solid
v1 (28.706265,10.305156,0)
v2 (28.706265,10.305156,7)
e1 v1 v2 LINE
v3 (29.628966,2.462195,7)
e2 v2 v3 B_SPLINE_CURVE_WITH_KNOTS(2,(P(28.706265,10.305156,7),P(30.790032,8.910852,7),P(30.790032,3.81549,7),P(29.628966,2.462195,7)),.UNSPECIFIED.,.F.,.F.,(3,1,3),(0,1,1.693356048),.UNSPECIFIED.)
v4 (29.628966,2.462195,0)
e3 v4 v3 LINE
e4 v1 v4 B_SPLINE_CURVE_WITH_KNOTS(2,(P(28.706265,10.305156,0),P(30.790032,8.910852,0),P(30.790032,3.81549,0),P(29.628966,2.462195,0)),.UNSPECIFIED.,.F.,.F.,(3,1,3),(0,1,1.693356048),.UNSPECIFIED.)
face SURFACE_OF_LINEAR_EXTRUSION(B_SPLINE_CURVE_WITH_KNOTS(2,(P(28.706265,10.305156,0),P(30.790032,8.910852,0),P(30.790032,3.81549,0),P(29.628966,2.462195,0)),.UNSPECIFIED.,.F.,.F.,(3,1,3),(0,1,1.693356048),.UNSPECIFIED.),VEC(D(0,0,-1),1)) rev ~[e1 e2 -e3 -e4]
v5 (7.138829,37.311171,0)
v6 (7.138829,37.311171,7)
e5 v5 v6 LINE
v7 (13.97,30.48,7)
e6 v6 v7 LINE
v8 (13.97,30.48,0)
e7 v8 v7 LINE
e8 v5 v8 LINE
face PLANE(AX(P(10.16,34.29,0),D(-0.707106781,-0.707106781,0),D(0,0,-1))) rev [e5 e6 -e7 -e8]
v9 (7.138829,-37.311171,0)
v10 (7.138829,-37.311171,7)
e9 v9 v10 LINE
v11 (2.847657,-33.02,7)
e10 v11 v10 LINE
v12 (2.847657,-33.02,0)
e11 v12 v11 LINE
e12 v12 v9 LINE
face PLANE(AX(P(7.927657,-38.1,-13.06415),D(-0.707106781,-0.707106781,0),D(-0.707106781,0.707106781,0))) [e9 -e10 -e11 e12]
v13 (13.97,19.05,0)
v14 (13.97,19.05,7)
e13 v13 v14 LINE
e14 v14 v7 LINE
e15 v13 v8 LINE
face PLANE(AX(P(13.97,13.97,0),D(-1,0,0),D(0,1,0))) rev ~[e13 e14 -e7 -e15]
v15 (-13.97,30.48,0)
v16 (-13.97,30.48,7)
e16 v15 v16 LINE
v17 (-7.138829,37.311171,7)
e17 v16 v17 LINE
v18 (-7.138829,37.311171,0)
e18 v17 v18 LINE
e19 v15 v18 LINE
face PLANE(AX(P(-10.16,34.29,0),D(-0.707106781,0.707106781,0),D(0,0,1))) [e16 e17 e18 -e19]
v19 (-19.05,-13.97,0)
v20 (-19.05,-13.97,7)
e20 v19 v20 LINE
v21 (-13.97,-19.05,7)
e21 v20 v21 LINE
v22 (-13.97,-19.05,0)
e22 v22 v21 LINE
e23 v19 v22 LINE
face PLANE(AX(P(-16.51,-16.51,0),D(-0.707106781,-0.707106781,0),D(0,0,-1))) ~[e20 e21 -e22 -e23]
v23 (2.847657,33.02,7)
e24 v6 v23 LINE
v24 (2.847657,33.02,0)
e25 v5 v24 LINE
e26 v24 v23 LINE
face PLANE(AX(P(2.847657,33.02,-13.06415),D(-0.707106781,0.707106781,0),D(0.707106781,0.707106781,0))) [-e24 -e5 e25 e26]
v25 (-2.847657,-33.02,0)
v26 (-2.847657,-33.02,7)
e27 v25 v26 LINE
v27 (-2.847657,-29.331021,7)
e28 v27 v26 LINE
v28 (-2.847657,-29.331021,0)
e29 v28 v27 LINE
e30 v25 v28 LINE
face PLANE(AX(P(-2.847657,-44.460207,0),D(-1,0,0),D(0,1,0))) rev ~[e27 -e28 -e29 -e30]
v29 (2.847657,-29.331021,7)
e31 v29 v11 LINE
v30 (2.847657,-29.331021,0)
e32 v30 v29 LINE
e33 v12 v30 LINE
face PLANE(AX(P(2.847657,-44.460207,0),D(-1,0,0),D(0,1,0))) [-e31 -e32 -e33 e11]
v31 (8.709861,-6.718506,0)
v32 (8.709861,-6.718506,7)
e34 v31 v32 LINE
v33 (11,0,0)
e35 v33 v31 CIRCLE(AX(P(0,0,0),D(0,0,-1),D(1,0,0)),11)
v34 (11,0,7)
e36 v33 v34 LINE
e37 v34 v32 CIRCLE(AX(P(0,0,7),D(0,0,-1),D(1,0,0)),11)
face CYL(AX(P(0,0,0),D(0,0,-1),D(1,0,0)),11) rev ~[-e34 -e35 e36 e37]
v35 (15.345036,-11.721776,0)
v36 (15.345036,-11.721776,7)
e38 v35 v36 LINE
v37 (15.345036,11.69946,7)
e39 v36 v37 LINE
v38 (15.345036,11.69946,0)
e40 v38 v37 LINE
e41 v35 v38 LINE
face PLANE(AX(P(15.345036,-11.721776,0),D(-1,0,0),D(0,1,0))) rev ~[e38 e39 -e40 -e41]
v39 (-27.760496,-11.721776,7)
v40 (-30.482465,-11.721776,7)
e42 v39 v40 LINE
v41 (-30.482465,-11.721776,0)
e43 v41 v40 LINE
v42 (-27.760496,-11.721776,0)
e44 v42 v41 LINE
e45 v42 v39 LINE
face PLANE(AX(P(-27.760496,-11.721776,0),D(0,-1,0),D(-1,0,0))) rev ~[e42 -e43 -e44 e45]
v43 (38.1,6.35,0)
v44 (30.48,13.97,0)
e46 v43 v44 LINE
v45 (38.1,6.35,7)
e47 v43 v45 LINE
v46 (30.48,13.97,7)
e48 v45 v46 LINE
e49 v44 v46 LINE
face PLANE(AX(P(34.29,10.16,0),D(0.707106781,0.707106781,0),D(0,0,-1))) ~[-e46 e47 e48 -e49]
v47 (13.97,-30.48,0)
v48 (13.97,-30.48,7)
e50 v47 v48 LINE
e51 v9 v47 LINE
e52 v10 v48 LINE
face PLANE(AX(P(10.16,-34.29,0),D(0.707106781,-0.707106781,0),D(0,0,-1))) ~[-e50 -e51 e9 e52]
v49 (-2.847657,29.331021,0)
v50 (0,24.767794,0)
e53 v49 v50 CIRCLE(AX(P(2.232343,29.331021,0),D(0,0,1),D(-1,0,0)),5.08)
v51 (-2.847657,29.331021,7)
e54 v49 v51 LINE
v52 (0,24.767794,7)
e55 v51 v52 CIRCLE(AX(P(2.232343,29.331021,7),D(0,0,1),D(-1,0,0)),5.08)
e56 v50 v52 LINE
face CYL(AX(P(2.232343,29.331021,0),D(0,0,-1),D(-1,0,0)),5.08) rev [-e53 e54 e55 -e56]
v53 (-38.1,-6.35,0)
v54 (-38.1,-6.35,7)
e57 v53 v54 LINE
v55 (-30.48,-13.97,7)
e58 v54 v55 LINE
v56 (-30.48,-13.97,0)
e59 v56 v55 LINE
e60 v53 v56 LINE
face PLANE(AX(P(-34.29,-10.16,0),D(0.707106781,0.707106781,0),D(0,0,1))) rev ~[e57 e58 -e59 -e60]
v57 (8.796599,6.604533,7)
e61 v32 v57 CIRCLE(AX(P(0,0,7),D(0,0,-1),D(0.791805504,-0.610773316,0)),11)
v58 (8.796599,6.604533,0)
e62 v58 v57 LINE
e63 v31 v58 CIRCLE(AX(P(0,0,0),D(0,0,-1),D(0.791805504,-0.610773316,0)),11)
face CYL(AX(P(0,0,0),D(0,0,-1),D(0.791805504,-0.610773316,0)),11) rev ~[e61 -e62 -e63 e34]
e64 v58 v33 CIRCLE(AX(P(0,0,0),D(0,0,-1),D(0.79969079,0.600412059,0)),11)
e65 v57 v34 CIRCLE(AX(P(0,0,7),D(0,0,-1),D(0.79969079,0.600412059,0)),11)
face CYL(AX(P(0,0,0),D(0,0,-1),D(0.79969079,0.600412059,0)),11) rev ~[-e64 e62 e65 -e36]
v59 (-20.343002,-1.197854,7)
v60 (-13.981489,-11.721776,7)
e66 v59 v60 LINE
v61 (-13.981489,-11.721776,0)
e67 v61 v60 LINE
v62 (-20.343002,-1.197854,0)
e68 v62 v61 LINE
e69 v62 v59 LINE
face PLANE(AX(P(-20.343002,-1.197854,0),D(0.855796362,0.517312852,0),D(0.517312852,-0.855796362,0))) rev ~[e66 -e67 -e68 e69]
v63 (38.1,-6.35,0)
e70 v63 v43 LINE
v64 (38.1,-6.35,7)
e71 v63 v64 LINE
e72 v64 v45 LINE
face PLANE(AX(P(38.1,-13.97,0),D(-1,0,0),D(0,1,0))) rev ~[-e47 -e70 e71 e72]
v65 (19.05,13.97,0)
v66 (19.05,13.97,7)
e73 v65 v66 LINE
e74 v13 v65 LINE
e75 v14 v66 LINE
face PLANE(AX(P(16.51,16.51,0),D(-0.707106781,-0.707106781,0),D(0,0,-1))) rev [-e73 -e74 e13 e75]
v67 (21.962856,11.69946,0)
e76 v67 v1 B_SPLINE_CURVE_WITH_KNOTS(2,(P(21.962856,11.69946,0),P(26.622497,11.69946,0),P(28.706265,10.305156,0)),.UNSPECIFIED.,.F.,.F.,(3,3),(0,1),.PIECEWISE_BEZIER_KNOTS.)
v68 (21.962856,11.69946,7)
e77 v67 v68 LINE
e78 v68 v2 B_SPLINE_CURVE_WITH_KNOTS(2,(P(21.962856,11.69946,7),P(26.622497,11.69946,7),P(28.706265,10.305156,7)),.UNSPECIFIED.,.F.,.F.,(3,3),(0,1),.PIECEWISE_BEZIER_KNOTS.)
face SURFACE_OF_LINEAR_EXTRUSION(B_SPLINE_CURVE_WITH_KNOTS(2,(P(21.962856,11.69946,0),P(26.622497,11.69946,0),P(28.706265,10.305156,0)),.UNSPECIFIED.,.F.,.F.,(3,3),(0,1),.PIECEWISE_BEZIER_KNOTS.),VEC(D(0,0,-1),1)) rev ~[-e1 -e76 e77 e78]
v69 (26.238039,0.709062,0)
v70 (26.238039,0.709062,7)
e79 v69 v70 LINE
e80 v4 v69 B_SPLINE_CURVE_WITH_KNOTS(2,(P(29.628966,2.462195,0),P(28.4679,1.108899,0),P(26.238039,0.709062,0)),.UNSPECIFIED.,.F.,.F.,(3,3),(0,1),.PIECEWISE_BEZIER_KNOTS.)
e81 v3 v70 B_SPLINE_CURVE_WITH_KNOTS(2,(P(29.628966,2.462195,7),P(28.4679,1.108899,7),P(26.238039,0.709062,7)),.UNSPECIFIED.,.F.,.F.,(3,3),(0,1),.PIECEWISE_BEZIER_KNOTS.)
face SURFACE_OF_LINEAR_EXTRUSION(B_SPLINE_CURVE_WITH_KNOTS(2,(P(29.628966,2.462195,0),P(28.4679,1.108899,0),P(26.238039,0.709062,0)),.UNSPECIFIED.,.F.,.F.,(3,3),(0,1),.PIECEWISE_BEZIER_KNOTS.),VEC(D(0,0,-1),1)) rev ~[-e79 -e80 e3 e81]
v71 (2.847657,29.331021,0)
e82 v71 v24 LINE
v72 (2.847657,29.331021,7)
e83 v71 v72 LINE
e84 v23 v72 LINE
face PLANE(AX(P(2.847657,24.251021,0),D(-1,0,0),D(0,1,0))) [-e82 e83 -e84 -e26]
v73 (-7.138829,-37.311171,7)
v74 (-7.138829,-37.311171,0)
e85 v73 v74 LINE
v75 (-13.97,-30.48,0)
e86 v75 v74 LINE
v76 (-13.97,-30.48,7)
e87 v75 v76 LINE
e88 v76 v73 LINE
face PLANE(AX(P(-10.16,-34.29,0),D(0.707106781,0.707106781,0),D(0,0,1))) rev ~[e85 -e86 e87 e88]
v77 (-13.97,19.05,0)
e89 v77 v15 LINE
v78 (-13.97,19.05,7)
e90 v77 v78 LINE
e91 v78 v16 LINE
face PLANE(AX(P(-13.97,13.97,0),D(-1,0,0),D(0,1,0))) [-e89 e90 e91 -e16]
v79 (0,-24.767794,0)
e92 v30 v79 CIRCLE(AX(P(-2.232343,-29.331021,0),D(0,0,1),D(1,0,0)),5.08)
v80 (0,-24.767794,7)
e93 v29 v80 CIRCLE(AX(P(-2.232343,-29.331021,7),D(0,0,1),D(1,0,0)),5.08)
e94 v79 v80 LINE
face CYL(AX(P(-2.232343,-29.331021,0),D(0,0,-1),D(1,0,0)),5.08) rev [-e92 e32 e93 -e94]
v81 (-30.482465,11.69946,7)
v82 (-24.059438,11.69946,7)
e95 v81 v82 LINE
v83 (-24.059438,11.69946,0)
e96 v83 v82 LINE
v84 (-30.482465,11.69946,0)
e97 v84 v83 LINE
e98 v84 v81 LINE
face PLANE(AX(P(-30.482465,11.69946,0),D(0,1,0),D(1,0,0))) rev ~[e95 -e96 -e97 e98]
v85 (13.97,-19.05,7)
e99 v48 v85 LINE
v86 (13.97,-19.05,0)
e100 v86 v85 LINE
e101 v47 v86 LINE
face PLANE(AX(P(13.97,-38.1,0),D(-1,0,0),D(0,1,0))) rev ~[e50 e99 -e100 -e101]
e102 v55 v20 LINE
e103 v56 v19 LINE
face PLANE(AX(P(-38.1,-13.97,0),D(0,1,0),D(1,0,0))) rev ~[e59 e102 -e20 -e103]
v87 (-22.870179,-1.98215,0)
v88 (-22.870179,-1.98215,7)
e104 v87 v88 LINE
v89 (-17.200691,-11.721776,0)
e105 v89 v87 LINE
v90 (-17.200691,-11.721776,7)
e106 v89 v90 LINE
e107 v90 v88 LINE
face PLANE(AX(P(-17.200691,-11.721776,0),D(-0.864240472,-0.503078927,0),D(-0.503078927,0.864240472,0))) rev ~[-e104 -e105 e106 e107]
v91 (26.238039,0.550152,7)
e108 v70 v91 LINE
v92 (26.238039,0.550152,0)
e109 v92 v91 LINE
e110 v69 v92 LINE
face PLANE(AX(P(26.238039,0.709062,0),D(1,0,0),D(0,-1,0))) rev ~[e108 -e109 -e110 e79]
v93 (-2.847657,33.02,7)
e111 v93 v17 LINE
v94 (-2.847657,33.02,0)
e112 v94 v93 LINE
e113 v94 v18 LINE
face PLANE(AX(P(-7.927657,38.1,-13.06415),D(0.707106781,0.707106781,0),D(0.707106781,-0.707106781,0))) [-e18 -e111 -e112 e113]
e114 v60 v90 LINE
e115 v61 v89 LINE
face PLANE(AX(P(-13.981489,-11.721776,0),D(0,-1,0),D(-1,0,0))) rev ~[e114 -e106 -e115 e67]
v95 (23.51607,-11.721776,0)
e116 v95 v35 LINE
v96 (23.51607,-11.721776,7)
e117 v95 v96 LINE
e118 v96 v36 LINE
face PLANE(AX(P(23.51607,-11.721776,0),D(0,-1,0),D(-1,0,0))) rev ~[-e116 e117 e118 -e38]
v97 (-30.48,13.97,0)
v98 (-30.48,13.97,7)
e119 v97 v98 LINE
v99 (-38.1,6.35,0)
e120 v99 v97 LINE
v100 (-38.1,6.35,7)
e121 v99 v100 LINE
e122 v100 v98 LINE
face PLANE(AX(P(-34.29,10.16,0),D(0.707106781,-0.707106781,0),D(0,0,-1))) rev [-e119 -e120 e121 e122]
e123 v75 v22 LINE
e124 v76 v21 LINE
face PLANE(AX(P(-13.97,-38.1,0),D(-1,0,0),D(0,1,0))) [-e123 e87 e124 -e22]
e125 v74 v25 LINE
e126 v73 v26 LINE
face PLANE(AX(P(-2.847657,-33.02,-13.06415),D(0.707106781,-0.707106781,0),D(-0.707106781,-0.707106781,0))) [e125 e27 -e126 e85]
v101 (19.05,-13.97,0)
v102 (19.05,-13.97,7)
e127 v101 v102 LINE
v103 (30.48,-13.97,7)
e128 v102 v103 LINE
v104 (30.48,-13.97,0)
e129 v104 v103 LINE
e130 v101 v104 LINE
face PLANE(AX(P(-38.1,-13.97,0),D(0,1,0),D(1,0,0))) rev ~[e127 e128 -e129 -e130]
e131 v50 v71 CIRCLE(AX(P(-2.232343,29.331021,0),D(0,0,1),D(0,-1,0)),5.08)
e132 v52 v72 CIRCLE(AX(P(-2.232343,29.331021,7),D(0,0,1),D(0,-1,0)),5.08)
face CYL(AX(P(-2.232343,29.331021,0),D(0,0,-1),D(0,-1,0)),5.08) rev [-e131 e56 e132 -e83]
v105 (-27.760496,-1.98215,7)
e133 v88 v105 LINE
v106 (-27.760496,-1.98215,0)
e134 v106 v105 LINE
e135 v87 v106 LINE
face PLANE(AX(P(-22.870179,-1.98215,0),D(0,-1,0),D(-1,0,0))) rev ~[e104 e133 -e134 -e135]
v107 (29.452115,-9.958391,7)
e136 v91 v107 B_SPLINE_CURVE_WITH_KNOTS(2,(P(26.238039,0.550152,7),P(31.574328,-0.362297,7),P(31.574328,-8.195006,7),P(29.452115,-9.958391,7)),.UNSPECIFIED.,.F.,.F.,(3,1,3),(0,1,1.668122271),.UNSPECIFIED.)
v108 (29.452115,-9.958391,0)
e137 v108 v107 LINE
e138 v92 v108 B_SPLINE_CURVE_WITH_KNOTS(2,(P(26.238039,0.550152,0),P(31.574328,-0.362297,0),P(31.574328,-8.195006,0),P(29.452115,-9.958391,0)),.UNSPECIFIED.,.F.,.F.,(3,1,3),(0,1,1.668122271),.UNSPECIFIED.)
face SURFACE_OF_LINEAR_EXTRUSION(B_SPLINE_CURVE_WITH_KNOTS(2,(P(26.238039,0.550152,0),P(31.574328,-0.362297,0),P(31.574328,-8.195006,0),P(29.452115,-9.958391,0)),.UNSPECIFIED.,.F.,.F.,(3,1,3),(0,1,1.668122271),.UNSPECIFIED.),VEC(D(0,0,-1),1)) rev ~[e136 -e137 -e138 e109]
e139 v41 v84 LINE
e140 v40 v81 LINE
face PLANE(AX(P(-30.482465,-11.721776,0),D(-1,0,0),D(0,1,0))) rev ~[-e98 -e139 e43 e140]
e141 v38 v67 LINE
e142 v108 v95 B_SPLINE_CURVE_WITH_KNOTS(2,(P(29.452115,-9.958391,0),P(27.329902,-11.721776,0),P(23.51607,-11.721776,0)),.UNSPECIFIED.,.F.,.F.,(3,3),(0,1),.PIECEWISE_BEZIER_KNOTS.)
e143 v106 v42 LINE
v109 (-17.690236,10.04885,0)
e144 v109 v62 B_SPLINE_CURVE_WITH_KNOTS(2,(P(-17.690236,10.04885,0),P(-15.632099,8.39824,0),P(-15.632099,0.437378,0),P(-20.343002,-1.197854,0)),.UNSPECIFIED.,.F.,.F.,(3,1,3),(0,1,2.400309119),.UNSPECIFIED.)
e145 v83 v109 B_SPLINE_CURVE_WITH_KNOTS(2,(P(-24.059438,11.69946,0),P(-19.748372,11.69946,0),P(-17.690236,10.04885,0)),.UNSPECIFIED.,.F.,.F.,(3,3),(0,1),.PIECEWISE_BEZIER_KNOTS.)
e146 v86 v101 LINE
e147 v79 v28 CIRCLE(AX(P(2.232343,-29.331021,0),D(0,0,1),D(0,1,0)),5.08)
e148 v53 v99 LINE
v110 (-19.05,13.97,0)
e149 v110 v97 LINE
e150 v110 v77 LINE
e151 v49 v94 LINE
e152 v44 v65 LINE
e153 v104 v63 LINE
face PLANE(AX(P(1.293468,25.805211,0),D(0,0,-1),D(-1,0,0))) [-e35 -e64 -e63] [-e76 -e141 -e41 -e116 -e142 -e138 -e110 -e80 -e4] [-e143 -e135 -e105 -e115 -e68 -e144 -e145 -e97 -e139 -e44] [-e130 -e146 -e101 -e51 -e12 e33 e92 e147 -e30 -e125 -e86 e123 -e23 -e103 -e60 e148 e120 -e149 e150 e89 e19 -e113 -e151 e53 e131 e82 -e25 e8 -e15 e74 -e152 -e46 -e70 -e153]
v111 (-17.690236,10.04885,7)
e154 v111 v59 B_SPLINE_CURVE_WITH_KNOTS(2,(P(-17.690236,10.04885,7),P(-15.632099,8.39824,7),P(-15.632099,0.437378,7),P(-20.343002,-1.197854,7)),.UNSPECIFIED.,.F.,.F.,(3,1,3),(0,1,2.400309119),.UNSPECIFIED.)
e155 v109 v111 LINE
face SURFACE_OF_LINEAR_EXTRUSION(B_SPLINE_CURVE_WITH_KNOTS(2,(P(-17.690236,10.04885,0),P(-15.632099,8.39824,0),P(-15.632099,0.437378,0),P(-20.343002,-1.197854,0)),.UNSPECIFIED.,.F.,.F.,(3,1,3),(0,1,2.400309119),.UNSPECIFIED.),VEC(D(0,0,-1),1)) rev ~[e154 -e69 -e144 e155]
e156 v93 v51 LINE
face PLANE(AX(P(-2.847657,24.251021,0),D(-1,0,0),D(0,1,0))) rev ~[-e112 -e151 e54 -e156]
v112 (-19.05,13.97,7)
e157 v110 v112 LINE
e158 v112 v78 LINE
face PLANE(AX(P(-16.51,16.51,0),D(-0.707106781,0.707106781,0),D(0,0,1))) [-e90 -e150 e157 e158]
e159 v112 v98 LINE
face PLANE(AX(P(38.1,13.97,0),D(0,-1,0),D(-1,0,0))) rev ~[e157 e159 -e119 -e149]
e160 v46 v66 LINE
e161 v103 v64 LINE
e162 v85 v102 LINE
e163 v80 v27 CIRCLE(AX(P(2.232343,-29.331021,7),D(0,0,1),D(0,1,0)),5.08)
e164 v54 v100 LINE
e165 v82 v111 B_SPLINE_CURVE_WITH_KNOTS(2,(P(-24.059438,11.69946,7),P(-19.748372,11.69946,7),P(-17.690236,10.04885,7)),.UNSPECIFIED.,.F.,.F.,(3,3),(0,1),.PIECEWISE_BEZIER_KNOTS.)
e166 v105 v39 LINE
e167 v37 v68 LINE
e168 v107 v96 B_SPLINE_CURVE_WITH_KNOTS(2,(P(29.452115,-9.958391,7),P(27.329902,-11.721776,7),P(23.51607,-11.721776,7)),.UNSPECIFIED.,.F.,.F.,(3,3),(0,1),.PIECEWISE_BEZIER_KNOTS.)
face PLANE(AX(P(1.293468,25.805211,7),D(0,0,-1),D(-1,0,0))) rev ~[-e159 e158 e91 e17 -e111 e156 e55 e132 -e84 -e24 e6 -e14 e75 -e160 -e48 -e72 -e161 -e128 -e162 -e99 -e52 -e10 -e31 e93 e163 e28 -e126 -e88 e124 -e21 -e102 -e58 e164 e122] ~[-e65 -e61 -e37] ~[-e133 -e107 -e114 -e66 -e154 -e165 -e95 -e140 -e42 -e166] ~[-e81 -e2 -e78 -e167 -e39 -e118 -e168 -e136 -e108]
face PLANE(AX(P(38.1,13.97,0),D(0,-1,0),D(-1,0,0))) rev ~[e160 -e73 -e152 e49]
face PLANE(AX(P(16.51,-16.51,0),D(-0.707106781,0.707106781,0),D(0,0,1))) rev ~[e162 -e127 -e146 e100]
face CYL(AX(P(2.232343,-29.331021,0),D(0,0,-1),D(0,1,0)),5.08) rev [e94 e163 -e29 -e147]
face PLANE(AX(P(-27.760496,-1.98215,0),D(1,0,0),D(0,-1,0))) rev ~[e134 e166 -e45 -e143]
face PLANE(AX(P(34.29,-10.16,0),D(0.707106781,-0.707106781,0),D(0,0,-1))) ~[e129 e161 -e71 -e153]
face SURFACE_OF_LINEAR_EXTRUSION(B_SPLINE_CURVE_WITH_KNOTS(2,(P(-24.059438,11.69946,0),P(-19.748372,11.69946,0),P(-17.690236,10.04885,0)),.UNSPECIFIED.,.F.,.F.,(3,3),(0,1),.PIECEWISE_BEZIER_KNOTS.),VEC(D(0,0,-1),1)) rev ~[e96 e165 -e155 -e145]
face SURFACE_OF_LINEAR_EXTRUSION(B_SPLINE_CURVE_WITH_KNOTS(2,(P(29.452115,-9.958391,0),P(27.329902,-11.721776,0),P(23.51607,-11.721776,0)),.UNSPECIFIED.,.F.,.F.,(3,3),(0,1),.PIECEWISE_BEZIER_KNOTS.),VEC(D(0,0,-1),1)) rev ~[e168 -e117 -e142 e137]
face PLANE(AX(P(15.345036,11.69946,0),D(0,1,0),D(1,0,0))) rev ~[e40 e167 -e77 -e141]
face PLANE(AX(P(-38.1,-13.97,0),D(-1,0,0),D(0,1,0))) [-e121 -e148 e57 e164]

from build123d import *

# Parameters (mm, degrees)
F0_W        = 24.13
F0_H        = 27.94
F0_W_2      = 27.94
F1_DEPTH    = 7
F0_H_2      = 24.13
F2_DEPTH    = 7
F3_SIZE     = 7.62
F4_SIZE     = 5.08
F5_W        = 5.6953141466
F5_H        = 27.5579802692
F5_H_2      = 20.2091857791
F6_DEPTH    = 46.736
F7_T1_DEPTH = 33.1282991577
F8_T1_DEPTH = 7


# Not quite as in the source:
# - a fillet or chamfer that OpenCascade refuses, or shapes differently, is made with other operations: its cross-section is extruded or revolved along the edge and cut away or added


with BuildPart() as f1:
    # F0 (on Top) → F1 (new body)
    with BuildSketch(Plane.XY):
        with Locations((-26.035, 0)):
            Rectangle(F0_W, F0_H)
        with BuildLine():
            Line((-22.8701785602, -1.9821503455), (-27.7604957957, -1.9821503455))
            Line((-27.7604957957, -1.9821503455), (-27.7604957957, -11.721775867))
            Line((-27.7604957957, -11.721775867), (-30.4824648231, -11.721775867))
            Line((-30.4824648231, -11.721775867), (-30.4824648231, 11.6994604529))
            Line((-30.4824648231, 11.6994604529), (-24.0594380975, 11.6994604529))
            add(Edge.make_bspline(
                [(-24.0594380975, 11.6994604529), (-19.7483722746, 11.6994604529), (-17.6902356183, 10.0488502329)],
                knots=[0, 0, 0, 1, 1, 1], degree=2))
            add(Edge.make_bspline(
                [(-17.6902356183, 10.0488502329), (-15.6320989621, 8.398240013), (-15.6320989621, 5.0816412169)],
                knots=[0, 0, 0, 1, 1, 1], degree=2))
            add(Edge.make_bspline(
                [(-15.6320989621, 5.0816412169), (-15.6320989621, 0.4373776788), (-20.3430020433, -1.1978541851)],
                knots=[0, 0, 0, 1, 1, 1], degree=2))
            Line((-20.3430020433, -1.1978541851), (-13.9814887421, -11.721775867))
            Line((-13.9814887421, -11.721775867), (-17.2006912829, -11.721775867))
            Line((-17.2006912829, -11.721775867), (-22.8701785602, -1.9821503455))
        make_face(mode=Mode.SUBTRACT)
        Rectangle(F0_W_2, F0_H)
        with BuildLine():
            ThreePointArc((8.7965986845, 6.6045326545), (10.4346199147, 3.4811933637), (11, 0))
            ThreePointArc((11, 0), (10.4117353498, -3.5490515643), (8.7098605443, -6.7185064783))
            add(Edge.make_bspline(
                [(8.7098605443, -6.7185064783), (8.1189739543, -7.8747447622), (7.281651607, -8.8229557447)],
                knots=[0.7056859188, 0.7056859188, 0.7056859188, 1, 1, 1], degree=2))
            add(Edge.make_bspline(
                [(7.281651607, -8.8229557447), (4.436655731, -12.0447213449), (-0.6228234215, -12.0447213449)],
                knots=[0, 0, 0, 1, 1, 1], degree=2))
            add(Edge.make_bspline(
                [(-0.6228234215, -12.0447213449), (-5.7950771853, -12.0447213449), (-8.6067532898, -8.8793430504)],
                knots=[0, 0, 0, 1, 1, 1], degree=2))
            add(Edge.make_bspline(
                [(-8.6067532898, -8.8793430504), (-11.4184293943, -5.7139647559), (-11.4184293943, 0.0529187766)],
                knots=[0, 0, 0, 1, 1, 1], degree=2))
            add(Edge.make_bspline(
                [(-11.4184293943, 0.0529187766), (-11.4184293943, 5.7736672408), (-8.5990641118, 8.9211041199)],
                knots=[0, 0, 0, 1, 1, 1], degree=2))
            add(Edge.make_bspline(
                [(-8.5990641118, 8.9211041199), (-5.7796988292, 12.068540999), (-0.5920667093, 12.068540999)],
                knots=[0, 0, 0, 1, 1, 1], degree=2))
            add(Edge.make_bspline(
                [(-0.5920667093, 12.068540999), (4.4571602058, 12.068540999), (7.2919038444, 8.8647168143)],
                knots=[0, 0, 0, 1, 1, 1], degree=2))
            add(Edge.make_bspline(
                [(7.2919038444, 8.8647168143), (8.1849092487, 7.8554430753), (8.7965986845, 6.6045326545)],
                knots=[0, 0, 0, 0.3150215745, 0.3150215745, 0.3150215745], degree=2))
        make_face(mode=Mode.SUBTRACT)
        with Locations((26.035, 0)):
            Rectangle(F0_W, F0_H)
        with BuildLine():
            Line((15.3450363151, -11.721775867), (15.3450363151, 11.6994604529))
            Line((15.3450363151, 11.6994604529), (21.9628555511, 11.6994604529))
            add(Edge.make_bspline(
                [(21.9628555511, 11.6994604529), (26.6224974453, 11.6994604529), (28.706264695, 10.3051561677)],
                knots=[0, 0, 0, 1, 1, 1], degree=2))
            add(Edge.make_bspline(
                [(28.706264695, 10.3051561677), (30.7900319448, 8.9108518825), (30.7900319448, 5.9018202082)],
                knots=[0, 0, 0, 1, 1, 1], degree=2))
            add(Edge.make_bspline(
                [(30.7900319448, 5.9018202082), (30.7900319448, 3.8154898992), (29.6289660602, 2.4621945635)],
                knots=[0, 0, 0, 1, 1, 1], degree=2))
            add(Edge.make_bspline(
                [(29.6289660602, 2.4621945635), (28.4679001757, 1.1088992279), (26.2380385431, 0.7090619697)],
                knots=[0, 0, 0, 1, 1, 1], degree=2))
            Line((26.2380385431, 0.7090619697), (26.2380385431, 0.5501522901))
            add(Edge.make_bspline(
                [(26.2380385431, 0.5501522901), (31.5743281052, -0.3622968377), (31.5743281052, -5.0578215628)],
                knots=[0, 0, 0, 1, 1, 1], degree=2))
            add(Edge.make_bspline(
                [(31.5743281052, -5.0578215628), (31.5743281052, -8.1950062045), (29.4521149653, -9.9583910358)],
                knots=[0, 0, 0, 1, 1, 1], degree=2))
            add(Edge.make_bspline(
                [(29.4521149653, -9.9583910358), (27.3299018253, -11.721775867), (23.5160695158, -11.721775867)],
                knots=[0, 0, 0, 1, 1, 1], degree=2))
            Line((23.5160695158, -11.721775867), (15.3450363151, -11.721775867))
        make_face(mode=Mode.SUBTRACT)
        with BuildLine():
            ThreePointArc((8.7098605443, -6.7185064783), (-10.9997668891, 0.0716127389), (8.7965986845, 6.6045326545))
            add(Edge.make_bspline(
                [(7.2919038444, 8.8647168143), (8.1849092487, 7.8554430753), (8.7965986845, 6.6045326545)],
                knots=[0, 0, 0, 0.3150215745, 0.3150215745, 0.3150215745], degree=2))
            add(Edge.make_bspline(
                [(-0.5920667093, 12.068540999), (4.4571602058, 12.068540999), (7.2919038444, 8.8647168143)],
                knots=[0, 0, 0, 1, 1, 1], degree=2))
            add(Edge.make_bspline(
                [(-8.5990641118, 8.9211041199), (-5.7796988292, 12.068540999), (-0.5920667093, 12.068540999)],
                knots=[0, 0, 0, 1, 1, 1], degree=2))
            add(Edge.make_bspline(
                [(-11.4184293943, 0.0529187766), (-11.4184293943, 5.7736672408), (-8.5990641118, 8.9211041199)],
                knots=[0, 0, 0, 1, 1, 1], degree=2))
            add(Edge.make_bspline(
                [(-8.6067532898, -8.8793430504), (-11.4184293943, -5.7139647559), (-11.4184293943, 0.0529187766)],
                knots=[0, 0, 0, 1, 1, 1], degree=2))
            add(Edge.make_bspline(
                [(-0.6228234215, -12.0447213449), (-5.7950771853, -12.0447213449), (-8.6067532898, -8.8793430504)],
                knots=[0, 0, 0, 1, 1, 1], degree=2))
            add(Edge.make_bspline(
                [(7.281651607, -8.8229557447), (4.436655731, -12.0447213449), (-0.6228234215, -12.0447213449)],
                knots=[0, 0, 0, 1, 1, 1], degree=2))
            add(Edge.make_bspline(
                [(8.7098605443, -6.7185064783), (8.1189739543, -7.8747447622), (7.281651607, -8.8229557447)],
                knots=[0.7056859188, 0.7056859188, 0.7056859188, 1, 1, 1], degree=2))
        make_face()
    extrude(amount=F1_DEPTH)

    # F0 (on Top) → F2 (join)
    with BuildSketch(Plane.XY):
        with Locations((-26.035, 0)):
            Rectangle(F0_W, F0_H)
        with BuildLine():
            Line((-22.8701785602, -1.9821503455), (-27.7604957957, -1.9821503455))
            Line((-27.7604957957, -1.9821503455), (-27.7604957957, -11.721775867))
            Line((-27.7604957957, -11.721775867), (-30.4824648231, -11.721775867))
            Line((-30.4824648231, -11.721775867), (-30.4824648231, 11.6994604529))
            Line((-30.4824648231, 11.6994604529), (-24.0594380975, 11.6994604529))
            add(Edge.make_bspline(
                [(-24.0594380975, 11.6994604529), (-19.7483722746, 11.6994604529), (-17.6902356183, 10.0488502329)],
                knots=[0, 0, 0, 1, 1, 1], degree=2))
            add(Edge.make_bspline(
                [(-17.6902356183, 10.0488502329), (-15.6320989621, 8.398240013), (-15.6320989621, 5.0816412169)],
                knots=[0, 0, 0, 1, 1, 1], degree=2))
            add(Edge.make_bspline(
                [(-15.6320989621, 5.0816412169), (-15.6320989621, 0.4373776788), (-20.3430020433, -1.1978541851)],
                knots=[0, 0, 0, 1, 1, 1], degree=2))
            Line((-20.3430020433, -1.1978541851), (-13.9814887421, -11.721775867))
            Line((-13.9814887421, -11.721775867), (-17.2006912829, -11.721775867))
            Line((-17.2006912829, -11.721775867), (-22.8701785602, -1.9821503455))
        make_face(mode=Mode.SUBTRACT)
        Rectangle(F0_W_2, F0_H)
        with BuildLine():
            ThreePointArc((8.7965986845, 6.6045326545), (10.4346199147, 3.4811933637), (11, 0))
            ThreePointArc((11, 0), (10.4117353498, -3.5490515643), (8.7098605443, -6.7185064783))
            add(Edge.make_bspline(
                [(8.7098605443, -6.7185064783), (8.1189739543, -7.8747447622), (7.281651607, -8.8229557447)],
                knots=[0.7056859188, 0.7056859188, 0.7056859188, 1, 1, 1], degree=2))
            add(Edge.make_bspline(
                [(7.281651607, -8.8229557447), (4.436655731, -12.0447213449), (-0.6228234215, -12.0447213449)],
                knots=[0, 0, 0, 1, 1, 1], degree=2))
            add(Edge.make_bspline(
                [(-0.6228234215, -12.0447213449), (-5.7950771853, -12.0447213449), (-8.6067532898, -8.8793430504)],
                knots=[0, 0, 0, 1, 1, 1], degree=2))
            add(Edge.make_bspline(
                [(-8.6067532898, -8.8793430504), (-11.4184293943, -5.7139647559), (-11.4184293943, 0.0529187766)],
                knots=[0, 0, 0, 1, 1, 1], degree=2))
            add(Edge.make_bspline(
                [(-11.4184293943, 0.0529187766), (-11.4184293943, 5.7736672408), (-8.5990641118, 8.9211041199)],
                knots=[0, 0, 0, 1, 1, 1], degree=2))
            add(Edge.make_bspline(
                [(-8.5990641118, 8.9211041199), (-5.7796988292, 12.068540999), (-0.5920667093, 12.068540999)],
                knots=[0, 0, 0, 1, 1, 1], degree=2))
            add(Edge.make_bspline(
                [(-0.5920667093, 12.068540999), (4.4571602058, 12.068540999), (7.2919038444, 8.8647168143)],
                knots=[0, 0, 0, 1, 1, 1], degree=2))
            add(Edge.make_bspline(
                [(7.2919038444, 8.8647168143), (8.1849092487, 7.8554430753), (8.7965986845, 6.6045326545)],
                knots=[0, 0, 0, 0.3150215745, 0.3150215745, 0.3150215745], degree=2))
        make_face(mode=Mode.SUBTRACT)
        with BuildLine():
            ThreePointArc((8.7098605443, -6.7185064783), (-10.9997668891, 0.0716127389), (8.7965986845, 6.6045326545))
            add(Edge.make_bspline(
                [(7.2919038444, 8.8647168143), (8.1849092487, 7.8554430753), (8.7965986845, 6.6045326545)],
                knots=[0, 0, 0, 0.3150215745, 0.3150215745, 0.3150215745], degree=2))
            add(Edge.make_bspline(
                [(-0.5920667093, 12.068540999), (4.4571602058, 12.068540999), (7.2919038444, 8.8647168143)],
                knots=[0, 0, 0, 1, 1, 1], degree=2))
            add(Edge.make_bspline(
                [(-8.5990641118, 8.9211041199), (-5.7796988292, 12.068540999), (-0.5920667093, 12.068540999)],
                knots=[0, 0, 0, 1, 1, 1], degree=2))
            add(Edge.make_bspline(
                [(-11.4184293943, 0.0529187766), (-11.4184293943, 5.7736672408), (-8.5990641118, 8.9211041199)],
                knots=[0, 0, 0, 1, 1, 1], degree=2))
            add(Edge.make_bspline(
                [(-8.6067532898, -8.8793430504), (-11.4184293943, -5.7139647559), (-11.4184293943, 0.0529187766)],
                knots=[0, 0, 0, 1, 1, 1], degree=2))
            add(Edge.make_bspline(
                [(-0.6228234215, -12.0447213449), (-5.7950771853, -12.0447213449), (-8.6067532898, -8.8793430504)],
                knots=[0, 0, 0, 1, 1, 1], degree=2))
            add(Edge.make_bspline(
                [(7.281651607, -8.8229557447), (4.436655731, -12.0447213449), (-0.6228234215, -12.0447213449)],
                knots=[0, 0, 0, 1, 1, 1], degree=2))
            add(Edge.make_bspline(
                [(8.7098605443, -6.7185064783), (8.1189739543, -7.8747447622), (7.281651607, -8.8229557447)],
                knots=[0.7056859188, 0.7056859188, 0.7056859188, 1, 1, 1], degree=2))
        make_face()
        with Locations((26.035, 0)):
            Rectangle(F0_W, F0_H)
        with BuildLine():
            Line((15.3450363151, -11.721775867), (15.3450363151, 11.6994604529))
            Line((15.3450363151, 11.6994604529), (21.9628555511, 11.6994604529))
            add(Edge.make_bspline(
                [(21.9628555511, 11.6994604529), (26.6224974453, 11.6994604529), (28.706264695, 10.3051561677)],
                knots=[0, 0, 0, 1, 1, 1], degree=2))
            add(Edge.make_bspline(
                [(28.706264695, 10.3051561677), (30.7900319448, 8.9108518825), (30.7900319448, 5.9018202082)],
                knots=[0, 0, 0, 1, 1, 1], degree=2))
            add(Edge.make_bspline(
                [(30.7900319448, 5.9018202082), (30.7900319448, 3.8154898992), (29.6289660602, 2.4621945635)],
                knots=[0, 0, 0, 1, 1, 1], degree=2))
            add(Edge.make_bspline(
                [(29.6289660602, 2.4621945635), (28.4679001757, 1.1088992279), (26.2380385431, 0.7090619697)],
                knots=[0, 0, 0, 1, 1, 1], degree=2))
            Line((26.2380385431, 0.7090619697), (26.2380385431, 0.5501522901))
            add(Edge.make_bspline(
                [(26.2380385431, 0.5501522901), (31.5743281052, -0.3622968377), (31.5743281052, -5.0578215628)],
                knots=[0, 0, 0, 1, 1, 1], degree=2))
            add(Edge.make_bspline(
                [(31.5743281052, -5.0578215628), (31.5743281052, -8.1950062045), (29.4521149653, -9.9583910358)],
                knots=[0, 0, 0, 1, 1, 1], degree=2))
            add(Edge.make_bspline(
                [(29.4521149653, -9.9583910358), (27.3299018253, -11.721775867), (23.5160695158, -11.721775867)],
                knots=[0, 0, 0, 1, 1, 1], degree=2))
            Line((23.5160695158, -11.721775867), (15.3450363151, -11.721775867))
        make_face(mode=Mode.SUBTRACT)
        with Locations((0, 26.035)):
            Rectangle(F0_W_2, F0_H_2)
        with Locations((0, -26.035)):
            Rectangle(F0_W_2, F0_H_2)
    extrude(amount=F2_DEPTH)

    # F3
    f3_edges = [f1.edges().sort_by_distance(p)[0] for p in [
        (13.97, 38.1, 3.5),
        (-13.97, 38.1, 3.5),
        (13.97, -38.1, 3.5),
        (-13.97, -38.1, 3.5),
        (38.1, -13.97, 3.5),
        (38.1, 13.97, 3.5),
        (-38.1, -13.97, 3.5),
        (-38.1, 13.97, 3.5),
    ]]
    chamfer(f3_edges, length=F3_SIZE)

    # F4
    f4_edges = [f1.edges().sort_by_distance(p)[0] for p in [
        (-13.97, -13.97, 3.5),
        (13.97, -13.97, 3.5),
        (-13.97, 13.97, 3.5),
        (13.97, 13.97, 3.5),
    ]]
    chamfer(f4_edges, length=F4_SIZE)

    # F5 (on Top) → F6 (cut)
    with BuildSketch(Plane.XY):
        with Locations((0, 38.0300115794)):
            Rectangle(F5_W, F5_H)
        with Locations((0, -34.3556143343)):
            Rectangle(F5_W, F5_H_2)
    extrude(amount=F6_DEPTH, mode=Mode.SUBTRACT)

    # F7: chamfer of 5.08 on 4 edges, made by hand

    # F7_s2 → F7_t1 (cut)
    with BuildSketch(Plane.XY.offset(-13.0641495789)):
        Polygon((2.8476570733, 33.02), (7.9276570733, 38.1), (2.8476570733, 38.1), align=None)
        Polygon((-7.9276570733, 38.1), (-2.8476570733, 33.02), (-2.8476570733, 38.1), align=None)
        Polygon((-2.8476570733, -33.02), (-7.9276570733, -38.1), (-2.8476570733, -38.1), align=None)
        Polygon((7.9276570733, -38.1), (2.8476570733, -33.02), (2.8476570733, -38.1), align=None)
    extrude(amount=F7_T1_DEPTH, mode=Mode.SUBTRACT)

    # F8: fillet of radius 5.08 on 4 edges, made by hand

    # F8_s2 → F8_t1 (join)
    with BuildSketch(Plane.XY):
        with BuildLine():
            ThreePointArc((-2.2323429267, 24.2510214448), (1.3597595217, 25.7389189964), (2.8476570733, 29.3310214448))
            Line((2.8476570733, 29.3310214448), (2.8476570733, 24.2510214448))
            Line((2.8476570733, 24.2510214448), (-2.2323429267, 24.2510214448))
        make_face()
        with BuildLine():
            ThreePointArc((-2.8476570733, 29.3310214448), (-1.3597595217, 25.7389189964), (2.2323429267, 24.2510214448))
            Line((2.2323429267, 24.2510214448), (-2.8476570733, 24.2510214448))
            Line((-2.8476570733, 24.2510214448), (-2.8476570733, 29.3310214448))
        make_face()
        with BuildLine():
            ThreePointArc((2.8476570733, -29.3310214448), (1.3597595217, -25.7389189964), (-2.2323429267, -24.2510214448))
            Line((-2.2323429267, -24.2510214448), (2.8476570733, -24.2510214448))
            Line((2.8476570733, -24.2510214448), (2.8476570733, -29.3310214448))
        make_face()
        with BuildLine():
            ThreePointArc((2.2323429267, -24.2510214448), (-1.3597595217, -25.7389189964), (-2.8476570733, -29.3310214448))
            Line((-2.8476570733, -29.3310214448), (-2.8476570733, -24.2510214448))
            Line((-2.8476570733, -24.2510214448), (2.2323429267, -24.2510214448))
        make_face()
    extrude(amount=F8_T1_DEPTH)


solid = f1.part
